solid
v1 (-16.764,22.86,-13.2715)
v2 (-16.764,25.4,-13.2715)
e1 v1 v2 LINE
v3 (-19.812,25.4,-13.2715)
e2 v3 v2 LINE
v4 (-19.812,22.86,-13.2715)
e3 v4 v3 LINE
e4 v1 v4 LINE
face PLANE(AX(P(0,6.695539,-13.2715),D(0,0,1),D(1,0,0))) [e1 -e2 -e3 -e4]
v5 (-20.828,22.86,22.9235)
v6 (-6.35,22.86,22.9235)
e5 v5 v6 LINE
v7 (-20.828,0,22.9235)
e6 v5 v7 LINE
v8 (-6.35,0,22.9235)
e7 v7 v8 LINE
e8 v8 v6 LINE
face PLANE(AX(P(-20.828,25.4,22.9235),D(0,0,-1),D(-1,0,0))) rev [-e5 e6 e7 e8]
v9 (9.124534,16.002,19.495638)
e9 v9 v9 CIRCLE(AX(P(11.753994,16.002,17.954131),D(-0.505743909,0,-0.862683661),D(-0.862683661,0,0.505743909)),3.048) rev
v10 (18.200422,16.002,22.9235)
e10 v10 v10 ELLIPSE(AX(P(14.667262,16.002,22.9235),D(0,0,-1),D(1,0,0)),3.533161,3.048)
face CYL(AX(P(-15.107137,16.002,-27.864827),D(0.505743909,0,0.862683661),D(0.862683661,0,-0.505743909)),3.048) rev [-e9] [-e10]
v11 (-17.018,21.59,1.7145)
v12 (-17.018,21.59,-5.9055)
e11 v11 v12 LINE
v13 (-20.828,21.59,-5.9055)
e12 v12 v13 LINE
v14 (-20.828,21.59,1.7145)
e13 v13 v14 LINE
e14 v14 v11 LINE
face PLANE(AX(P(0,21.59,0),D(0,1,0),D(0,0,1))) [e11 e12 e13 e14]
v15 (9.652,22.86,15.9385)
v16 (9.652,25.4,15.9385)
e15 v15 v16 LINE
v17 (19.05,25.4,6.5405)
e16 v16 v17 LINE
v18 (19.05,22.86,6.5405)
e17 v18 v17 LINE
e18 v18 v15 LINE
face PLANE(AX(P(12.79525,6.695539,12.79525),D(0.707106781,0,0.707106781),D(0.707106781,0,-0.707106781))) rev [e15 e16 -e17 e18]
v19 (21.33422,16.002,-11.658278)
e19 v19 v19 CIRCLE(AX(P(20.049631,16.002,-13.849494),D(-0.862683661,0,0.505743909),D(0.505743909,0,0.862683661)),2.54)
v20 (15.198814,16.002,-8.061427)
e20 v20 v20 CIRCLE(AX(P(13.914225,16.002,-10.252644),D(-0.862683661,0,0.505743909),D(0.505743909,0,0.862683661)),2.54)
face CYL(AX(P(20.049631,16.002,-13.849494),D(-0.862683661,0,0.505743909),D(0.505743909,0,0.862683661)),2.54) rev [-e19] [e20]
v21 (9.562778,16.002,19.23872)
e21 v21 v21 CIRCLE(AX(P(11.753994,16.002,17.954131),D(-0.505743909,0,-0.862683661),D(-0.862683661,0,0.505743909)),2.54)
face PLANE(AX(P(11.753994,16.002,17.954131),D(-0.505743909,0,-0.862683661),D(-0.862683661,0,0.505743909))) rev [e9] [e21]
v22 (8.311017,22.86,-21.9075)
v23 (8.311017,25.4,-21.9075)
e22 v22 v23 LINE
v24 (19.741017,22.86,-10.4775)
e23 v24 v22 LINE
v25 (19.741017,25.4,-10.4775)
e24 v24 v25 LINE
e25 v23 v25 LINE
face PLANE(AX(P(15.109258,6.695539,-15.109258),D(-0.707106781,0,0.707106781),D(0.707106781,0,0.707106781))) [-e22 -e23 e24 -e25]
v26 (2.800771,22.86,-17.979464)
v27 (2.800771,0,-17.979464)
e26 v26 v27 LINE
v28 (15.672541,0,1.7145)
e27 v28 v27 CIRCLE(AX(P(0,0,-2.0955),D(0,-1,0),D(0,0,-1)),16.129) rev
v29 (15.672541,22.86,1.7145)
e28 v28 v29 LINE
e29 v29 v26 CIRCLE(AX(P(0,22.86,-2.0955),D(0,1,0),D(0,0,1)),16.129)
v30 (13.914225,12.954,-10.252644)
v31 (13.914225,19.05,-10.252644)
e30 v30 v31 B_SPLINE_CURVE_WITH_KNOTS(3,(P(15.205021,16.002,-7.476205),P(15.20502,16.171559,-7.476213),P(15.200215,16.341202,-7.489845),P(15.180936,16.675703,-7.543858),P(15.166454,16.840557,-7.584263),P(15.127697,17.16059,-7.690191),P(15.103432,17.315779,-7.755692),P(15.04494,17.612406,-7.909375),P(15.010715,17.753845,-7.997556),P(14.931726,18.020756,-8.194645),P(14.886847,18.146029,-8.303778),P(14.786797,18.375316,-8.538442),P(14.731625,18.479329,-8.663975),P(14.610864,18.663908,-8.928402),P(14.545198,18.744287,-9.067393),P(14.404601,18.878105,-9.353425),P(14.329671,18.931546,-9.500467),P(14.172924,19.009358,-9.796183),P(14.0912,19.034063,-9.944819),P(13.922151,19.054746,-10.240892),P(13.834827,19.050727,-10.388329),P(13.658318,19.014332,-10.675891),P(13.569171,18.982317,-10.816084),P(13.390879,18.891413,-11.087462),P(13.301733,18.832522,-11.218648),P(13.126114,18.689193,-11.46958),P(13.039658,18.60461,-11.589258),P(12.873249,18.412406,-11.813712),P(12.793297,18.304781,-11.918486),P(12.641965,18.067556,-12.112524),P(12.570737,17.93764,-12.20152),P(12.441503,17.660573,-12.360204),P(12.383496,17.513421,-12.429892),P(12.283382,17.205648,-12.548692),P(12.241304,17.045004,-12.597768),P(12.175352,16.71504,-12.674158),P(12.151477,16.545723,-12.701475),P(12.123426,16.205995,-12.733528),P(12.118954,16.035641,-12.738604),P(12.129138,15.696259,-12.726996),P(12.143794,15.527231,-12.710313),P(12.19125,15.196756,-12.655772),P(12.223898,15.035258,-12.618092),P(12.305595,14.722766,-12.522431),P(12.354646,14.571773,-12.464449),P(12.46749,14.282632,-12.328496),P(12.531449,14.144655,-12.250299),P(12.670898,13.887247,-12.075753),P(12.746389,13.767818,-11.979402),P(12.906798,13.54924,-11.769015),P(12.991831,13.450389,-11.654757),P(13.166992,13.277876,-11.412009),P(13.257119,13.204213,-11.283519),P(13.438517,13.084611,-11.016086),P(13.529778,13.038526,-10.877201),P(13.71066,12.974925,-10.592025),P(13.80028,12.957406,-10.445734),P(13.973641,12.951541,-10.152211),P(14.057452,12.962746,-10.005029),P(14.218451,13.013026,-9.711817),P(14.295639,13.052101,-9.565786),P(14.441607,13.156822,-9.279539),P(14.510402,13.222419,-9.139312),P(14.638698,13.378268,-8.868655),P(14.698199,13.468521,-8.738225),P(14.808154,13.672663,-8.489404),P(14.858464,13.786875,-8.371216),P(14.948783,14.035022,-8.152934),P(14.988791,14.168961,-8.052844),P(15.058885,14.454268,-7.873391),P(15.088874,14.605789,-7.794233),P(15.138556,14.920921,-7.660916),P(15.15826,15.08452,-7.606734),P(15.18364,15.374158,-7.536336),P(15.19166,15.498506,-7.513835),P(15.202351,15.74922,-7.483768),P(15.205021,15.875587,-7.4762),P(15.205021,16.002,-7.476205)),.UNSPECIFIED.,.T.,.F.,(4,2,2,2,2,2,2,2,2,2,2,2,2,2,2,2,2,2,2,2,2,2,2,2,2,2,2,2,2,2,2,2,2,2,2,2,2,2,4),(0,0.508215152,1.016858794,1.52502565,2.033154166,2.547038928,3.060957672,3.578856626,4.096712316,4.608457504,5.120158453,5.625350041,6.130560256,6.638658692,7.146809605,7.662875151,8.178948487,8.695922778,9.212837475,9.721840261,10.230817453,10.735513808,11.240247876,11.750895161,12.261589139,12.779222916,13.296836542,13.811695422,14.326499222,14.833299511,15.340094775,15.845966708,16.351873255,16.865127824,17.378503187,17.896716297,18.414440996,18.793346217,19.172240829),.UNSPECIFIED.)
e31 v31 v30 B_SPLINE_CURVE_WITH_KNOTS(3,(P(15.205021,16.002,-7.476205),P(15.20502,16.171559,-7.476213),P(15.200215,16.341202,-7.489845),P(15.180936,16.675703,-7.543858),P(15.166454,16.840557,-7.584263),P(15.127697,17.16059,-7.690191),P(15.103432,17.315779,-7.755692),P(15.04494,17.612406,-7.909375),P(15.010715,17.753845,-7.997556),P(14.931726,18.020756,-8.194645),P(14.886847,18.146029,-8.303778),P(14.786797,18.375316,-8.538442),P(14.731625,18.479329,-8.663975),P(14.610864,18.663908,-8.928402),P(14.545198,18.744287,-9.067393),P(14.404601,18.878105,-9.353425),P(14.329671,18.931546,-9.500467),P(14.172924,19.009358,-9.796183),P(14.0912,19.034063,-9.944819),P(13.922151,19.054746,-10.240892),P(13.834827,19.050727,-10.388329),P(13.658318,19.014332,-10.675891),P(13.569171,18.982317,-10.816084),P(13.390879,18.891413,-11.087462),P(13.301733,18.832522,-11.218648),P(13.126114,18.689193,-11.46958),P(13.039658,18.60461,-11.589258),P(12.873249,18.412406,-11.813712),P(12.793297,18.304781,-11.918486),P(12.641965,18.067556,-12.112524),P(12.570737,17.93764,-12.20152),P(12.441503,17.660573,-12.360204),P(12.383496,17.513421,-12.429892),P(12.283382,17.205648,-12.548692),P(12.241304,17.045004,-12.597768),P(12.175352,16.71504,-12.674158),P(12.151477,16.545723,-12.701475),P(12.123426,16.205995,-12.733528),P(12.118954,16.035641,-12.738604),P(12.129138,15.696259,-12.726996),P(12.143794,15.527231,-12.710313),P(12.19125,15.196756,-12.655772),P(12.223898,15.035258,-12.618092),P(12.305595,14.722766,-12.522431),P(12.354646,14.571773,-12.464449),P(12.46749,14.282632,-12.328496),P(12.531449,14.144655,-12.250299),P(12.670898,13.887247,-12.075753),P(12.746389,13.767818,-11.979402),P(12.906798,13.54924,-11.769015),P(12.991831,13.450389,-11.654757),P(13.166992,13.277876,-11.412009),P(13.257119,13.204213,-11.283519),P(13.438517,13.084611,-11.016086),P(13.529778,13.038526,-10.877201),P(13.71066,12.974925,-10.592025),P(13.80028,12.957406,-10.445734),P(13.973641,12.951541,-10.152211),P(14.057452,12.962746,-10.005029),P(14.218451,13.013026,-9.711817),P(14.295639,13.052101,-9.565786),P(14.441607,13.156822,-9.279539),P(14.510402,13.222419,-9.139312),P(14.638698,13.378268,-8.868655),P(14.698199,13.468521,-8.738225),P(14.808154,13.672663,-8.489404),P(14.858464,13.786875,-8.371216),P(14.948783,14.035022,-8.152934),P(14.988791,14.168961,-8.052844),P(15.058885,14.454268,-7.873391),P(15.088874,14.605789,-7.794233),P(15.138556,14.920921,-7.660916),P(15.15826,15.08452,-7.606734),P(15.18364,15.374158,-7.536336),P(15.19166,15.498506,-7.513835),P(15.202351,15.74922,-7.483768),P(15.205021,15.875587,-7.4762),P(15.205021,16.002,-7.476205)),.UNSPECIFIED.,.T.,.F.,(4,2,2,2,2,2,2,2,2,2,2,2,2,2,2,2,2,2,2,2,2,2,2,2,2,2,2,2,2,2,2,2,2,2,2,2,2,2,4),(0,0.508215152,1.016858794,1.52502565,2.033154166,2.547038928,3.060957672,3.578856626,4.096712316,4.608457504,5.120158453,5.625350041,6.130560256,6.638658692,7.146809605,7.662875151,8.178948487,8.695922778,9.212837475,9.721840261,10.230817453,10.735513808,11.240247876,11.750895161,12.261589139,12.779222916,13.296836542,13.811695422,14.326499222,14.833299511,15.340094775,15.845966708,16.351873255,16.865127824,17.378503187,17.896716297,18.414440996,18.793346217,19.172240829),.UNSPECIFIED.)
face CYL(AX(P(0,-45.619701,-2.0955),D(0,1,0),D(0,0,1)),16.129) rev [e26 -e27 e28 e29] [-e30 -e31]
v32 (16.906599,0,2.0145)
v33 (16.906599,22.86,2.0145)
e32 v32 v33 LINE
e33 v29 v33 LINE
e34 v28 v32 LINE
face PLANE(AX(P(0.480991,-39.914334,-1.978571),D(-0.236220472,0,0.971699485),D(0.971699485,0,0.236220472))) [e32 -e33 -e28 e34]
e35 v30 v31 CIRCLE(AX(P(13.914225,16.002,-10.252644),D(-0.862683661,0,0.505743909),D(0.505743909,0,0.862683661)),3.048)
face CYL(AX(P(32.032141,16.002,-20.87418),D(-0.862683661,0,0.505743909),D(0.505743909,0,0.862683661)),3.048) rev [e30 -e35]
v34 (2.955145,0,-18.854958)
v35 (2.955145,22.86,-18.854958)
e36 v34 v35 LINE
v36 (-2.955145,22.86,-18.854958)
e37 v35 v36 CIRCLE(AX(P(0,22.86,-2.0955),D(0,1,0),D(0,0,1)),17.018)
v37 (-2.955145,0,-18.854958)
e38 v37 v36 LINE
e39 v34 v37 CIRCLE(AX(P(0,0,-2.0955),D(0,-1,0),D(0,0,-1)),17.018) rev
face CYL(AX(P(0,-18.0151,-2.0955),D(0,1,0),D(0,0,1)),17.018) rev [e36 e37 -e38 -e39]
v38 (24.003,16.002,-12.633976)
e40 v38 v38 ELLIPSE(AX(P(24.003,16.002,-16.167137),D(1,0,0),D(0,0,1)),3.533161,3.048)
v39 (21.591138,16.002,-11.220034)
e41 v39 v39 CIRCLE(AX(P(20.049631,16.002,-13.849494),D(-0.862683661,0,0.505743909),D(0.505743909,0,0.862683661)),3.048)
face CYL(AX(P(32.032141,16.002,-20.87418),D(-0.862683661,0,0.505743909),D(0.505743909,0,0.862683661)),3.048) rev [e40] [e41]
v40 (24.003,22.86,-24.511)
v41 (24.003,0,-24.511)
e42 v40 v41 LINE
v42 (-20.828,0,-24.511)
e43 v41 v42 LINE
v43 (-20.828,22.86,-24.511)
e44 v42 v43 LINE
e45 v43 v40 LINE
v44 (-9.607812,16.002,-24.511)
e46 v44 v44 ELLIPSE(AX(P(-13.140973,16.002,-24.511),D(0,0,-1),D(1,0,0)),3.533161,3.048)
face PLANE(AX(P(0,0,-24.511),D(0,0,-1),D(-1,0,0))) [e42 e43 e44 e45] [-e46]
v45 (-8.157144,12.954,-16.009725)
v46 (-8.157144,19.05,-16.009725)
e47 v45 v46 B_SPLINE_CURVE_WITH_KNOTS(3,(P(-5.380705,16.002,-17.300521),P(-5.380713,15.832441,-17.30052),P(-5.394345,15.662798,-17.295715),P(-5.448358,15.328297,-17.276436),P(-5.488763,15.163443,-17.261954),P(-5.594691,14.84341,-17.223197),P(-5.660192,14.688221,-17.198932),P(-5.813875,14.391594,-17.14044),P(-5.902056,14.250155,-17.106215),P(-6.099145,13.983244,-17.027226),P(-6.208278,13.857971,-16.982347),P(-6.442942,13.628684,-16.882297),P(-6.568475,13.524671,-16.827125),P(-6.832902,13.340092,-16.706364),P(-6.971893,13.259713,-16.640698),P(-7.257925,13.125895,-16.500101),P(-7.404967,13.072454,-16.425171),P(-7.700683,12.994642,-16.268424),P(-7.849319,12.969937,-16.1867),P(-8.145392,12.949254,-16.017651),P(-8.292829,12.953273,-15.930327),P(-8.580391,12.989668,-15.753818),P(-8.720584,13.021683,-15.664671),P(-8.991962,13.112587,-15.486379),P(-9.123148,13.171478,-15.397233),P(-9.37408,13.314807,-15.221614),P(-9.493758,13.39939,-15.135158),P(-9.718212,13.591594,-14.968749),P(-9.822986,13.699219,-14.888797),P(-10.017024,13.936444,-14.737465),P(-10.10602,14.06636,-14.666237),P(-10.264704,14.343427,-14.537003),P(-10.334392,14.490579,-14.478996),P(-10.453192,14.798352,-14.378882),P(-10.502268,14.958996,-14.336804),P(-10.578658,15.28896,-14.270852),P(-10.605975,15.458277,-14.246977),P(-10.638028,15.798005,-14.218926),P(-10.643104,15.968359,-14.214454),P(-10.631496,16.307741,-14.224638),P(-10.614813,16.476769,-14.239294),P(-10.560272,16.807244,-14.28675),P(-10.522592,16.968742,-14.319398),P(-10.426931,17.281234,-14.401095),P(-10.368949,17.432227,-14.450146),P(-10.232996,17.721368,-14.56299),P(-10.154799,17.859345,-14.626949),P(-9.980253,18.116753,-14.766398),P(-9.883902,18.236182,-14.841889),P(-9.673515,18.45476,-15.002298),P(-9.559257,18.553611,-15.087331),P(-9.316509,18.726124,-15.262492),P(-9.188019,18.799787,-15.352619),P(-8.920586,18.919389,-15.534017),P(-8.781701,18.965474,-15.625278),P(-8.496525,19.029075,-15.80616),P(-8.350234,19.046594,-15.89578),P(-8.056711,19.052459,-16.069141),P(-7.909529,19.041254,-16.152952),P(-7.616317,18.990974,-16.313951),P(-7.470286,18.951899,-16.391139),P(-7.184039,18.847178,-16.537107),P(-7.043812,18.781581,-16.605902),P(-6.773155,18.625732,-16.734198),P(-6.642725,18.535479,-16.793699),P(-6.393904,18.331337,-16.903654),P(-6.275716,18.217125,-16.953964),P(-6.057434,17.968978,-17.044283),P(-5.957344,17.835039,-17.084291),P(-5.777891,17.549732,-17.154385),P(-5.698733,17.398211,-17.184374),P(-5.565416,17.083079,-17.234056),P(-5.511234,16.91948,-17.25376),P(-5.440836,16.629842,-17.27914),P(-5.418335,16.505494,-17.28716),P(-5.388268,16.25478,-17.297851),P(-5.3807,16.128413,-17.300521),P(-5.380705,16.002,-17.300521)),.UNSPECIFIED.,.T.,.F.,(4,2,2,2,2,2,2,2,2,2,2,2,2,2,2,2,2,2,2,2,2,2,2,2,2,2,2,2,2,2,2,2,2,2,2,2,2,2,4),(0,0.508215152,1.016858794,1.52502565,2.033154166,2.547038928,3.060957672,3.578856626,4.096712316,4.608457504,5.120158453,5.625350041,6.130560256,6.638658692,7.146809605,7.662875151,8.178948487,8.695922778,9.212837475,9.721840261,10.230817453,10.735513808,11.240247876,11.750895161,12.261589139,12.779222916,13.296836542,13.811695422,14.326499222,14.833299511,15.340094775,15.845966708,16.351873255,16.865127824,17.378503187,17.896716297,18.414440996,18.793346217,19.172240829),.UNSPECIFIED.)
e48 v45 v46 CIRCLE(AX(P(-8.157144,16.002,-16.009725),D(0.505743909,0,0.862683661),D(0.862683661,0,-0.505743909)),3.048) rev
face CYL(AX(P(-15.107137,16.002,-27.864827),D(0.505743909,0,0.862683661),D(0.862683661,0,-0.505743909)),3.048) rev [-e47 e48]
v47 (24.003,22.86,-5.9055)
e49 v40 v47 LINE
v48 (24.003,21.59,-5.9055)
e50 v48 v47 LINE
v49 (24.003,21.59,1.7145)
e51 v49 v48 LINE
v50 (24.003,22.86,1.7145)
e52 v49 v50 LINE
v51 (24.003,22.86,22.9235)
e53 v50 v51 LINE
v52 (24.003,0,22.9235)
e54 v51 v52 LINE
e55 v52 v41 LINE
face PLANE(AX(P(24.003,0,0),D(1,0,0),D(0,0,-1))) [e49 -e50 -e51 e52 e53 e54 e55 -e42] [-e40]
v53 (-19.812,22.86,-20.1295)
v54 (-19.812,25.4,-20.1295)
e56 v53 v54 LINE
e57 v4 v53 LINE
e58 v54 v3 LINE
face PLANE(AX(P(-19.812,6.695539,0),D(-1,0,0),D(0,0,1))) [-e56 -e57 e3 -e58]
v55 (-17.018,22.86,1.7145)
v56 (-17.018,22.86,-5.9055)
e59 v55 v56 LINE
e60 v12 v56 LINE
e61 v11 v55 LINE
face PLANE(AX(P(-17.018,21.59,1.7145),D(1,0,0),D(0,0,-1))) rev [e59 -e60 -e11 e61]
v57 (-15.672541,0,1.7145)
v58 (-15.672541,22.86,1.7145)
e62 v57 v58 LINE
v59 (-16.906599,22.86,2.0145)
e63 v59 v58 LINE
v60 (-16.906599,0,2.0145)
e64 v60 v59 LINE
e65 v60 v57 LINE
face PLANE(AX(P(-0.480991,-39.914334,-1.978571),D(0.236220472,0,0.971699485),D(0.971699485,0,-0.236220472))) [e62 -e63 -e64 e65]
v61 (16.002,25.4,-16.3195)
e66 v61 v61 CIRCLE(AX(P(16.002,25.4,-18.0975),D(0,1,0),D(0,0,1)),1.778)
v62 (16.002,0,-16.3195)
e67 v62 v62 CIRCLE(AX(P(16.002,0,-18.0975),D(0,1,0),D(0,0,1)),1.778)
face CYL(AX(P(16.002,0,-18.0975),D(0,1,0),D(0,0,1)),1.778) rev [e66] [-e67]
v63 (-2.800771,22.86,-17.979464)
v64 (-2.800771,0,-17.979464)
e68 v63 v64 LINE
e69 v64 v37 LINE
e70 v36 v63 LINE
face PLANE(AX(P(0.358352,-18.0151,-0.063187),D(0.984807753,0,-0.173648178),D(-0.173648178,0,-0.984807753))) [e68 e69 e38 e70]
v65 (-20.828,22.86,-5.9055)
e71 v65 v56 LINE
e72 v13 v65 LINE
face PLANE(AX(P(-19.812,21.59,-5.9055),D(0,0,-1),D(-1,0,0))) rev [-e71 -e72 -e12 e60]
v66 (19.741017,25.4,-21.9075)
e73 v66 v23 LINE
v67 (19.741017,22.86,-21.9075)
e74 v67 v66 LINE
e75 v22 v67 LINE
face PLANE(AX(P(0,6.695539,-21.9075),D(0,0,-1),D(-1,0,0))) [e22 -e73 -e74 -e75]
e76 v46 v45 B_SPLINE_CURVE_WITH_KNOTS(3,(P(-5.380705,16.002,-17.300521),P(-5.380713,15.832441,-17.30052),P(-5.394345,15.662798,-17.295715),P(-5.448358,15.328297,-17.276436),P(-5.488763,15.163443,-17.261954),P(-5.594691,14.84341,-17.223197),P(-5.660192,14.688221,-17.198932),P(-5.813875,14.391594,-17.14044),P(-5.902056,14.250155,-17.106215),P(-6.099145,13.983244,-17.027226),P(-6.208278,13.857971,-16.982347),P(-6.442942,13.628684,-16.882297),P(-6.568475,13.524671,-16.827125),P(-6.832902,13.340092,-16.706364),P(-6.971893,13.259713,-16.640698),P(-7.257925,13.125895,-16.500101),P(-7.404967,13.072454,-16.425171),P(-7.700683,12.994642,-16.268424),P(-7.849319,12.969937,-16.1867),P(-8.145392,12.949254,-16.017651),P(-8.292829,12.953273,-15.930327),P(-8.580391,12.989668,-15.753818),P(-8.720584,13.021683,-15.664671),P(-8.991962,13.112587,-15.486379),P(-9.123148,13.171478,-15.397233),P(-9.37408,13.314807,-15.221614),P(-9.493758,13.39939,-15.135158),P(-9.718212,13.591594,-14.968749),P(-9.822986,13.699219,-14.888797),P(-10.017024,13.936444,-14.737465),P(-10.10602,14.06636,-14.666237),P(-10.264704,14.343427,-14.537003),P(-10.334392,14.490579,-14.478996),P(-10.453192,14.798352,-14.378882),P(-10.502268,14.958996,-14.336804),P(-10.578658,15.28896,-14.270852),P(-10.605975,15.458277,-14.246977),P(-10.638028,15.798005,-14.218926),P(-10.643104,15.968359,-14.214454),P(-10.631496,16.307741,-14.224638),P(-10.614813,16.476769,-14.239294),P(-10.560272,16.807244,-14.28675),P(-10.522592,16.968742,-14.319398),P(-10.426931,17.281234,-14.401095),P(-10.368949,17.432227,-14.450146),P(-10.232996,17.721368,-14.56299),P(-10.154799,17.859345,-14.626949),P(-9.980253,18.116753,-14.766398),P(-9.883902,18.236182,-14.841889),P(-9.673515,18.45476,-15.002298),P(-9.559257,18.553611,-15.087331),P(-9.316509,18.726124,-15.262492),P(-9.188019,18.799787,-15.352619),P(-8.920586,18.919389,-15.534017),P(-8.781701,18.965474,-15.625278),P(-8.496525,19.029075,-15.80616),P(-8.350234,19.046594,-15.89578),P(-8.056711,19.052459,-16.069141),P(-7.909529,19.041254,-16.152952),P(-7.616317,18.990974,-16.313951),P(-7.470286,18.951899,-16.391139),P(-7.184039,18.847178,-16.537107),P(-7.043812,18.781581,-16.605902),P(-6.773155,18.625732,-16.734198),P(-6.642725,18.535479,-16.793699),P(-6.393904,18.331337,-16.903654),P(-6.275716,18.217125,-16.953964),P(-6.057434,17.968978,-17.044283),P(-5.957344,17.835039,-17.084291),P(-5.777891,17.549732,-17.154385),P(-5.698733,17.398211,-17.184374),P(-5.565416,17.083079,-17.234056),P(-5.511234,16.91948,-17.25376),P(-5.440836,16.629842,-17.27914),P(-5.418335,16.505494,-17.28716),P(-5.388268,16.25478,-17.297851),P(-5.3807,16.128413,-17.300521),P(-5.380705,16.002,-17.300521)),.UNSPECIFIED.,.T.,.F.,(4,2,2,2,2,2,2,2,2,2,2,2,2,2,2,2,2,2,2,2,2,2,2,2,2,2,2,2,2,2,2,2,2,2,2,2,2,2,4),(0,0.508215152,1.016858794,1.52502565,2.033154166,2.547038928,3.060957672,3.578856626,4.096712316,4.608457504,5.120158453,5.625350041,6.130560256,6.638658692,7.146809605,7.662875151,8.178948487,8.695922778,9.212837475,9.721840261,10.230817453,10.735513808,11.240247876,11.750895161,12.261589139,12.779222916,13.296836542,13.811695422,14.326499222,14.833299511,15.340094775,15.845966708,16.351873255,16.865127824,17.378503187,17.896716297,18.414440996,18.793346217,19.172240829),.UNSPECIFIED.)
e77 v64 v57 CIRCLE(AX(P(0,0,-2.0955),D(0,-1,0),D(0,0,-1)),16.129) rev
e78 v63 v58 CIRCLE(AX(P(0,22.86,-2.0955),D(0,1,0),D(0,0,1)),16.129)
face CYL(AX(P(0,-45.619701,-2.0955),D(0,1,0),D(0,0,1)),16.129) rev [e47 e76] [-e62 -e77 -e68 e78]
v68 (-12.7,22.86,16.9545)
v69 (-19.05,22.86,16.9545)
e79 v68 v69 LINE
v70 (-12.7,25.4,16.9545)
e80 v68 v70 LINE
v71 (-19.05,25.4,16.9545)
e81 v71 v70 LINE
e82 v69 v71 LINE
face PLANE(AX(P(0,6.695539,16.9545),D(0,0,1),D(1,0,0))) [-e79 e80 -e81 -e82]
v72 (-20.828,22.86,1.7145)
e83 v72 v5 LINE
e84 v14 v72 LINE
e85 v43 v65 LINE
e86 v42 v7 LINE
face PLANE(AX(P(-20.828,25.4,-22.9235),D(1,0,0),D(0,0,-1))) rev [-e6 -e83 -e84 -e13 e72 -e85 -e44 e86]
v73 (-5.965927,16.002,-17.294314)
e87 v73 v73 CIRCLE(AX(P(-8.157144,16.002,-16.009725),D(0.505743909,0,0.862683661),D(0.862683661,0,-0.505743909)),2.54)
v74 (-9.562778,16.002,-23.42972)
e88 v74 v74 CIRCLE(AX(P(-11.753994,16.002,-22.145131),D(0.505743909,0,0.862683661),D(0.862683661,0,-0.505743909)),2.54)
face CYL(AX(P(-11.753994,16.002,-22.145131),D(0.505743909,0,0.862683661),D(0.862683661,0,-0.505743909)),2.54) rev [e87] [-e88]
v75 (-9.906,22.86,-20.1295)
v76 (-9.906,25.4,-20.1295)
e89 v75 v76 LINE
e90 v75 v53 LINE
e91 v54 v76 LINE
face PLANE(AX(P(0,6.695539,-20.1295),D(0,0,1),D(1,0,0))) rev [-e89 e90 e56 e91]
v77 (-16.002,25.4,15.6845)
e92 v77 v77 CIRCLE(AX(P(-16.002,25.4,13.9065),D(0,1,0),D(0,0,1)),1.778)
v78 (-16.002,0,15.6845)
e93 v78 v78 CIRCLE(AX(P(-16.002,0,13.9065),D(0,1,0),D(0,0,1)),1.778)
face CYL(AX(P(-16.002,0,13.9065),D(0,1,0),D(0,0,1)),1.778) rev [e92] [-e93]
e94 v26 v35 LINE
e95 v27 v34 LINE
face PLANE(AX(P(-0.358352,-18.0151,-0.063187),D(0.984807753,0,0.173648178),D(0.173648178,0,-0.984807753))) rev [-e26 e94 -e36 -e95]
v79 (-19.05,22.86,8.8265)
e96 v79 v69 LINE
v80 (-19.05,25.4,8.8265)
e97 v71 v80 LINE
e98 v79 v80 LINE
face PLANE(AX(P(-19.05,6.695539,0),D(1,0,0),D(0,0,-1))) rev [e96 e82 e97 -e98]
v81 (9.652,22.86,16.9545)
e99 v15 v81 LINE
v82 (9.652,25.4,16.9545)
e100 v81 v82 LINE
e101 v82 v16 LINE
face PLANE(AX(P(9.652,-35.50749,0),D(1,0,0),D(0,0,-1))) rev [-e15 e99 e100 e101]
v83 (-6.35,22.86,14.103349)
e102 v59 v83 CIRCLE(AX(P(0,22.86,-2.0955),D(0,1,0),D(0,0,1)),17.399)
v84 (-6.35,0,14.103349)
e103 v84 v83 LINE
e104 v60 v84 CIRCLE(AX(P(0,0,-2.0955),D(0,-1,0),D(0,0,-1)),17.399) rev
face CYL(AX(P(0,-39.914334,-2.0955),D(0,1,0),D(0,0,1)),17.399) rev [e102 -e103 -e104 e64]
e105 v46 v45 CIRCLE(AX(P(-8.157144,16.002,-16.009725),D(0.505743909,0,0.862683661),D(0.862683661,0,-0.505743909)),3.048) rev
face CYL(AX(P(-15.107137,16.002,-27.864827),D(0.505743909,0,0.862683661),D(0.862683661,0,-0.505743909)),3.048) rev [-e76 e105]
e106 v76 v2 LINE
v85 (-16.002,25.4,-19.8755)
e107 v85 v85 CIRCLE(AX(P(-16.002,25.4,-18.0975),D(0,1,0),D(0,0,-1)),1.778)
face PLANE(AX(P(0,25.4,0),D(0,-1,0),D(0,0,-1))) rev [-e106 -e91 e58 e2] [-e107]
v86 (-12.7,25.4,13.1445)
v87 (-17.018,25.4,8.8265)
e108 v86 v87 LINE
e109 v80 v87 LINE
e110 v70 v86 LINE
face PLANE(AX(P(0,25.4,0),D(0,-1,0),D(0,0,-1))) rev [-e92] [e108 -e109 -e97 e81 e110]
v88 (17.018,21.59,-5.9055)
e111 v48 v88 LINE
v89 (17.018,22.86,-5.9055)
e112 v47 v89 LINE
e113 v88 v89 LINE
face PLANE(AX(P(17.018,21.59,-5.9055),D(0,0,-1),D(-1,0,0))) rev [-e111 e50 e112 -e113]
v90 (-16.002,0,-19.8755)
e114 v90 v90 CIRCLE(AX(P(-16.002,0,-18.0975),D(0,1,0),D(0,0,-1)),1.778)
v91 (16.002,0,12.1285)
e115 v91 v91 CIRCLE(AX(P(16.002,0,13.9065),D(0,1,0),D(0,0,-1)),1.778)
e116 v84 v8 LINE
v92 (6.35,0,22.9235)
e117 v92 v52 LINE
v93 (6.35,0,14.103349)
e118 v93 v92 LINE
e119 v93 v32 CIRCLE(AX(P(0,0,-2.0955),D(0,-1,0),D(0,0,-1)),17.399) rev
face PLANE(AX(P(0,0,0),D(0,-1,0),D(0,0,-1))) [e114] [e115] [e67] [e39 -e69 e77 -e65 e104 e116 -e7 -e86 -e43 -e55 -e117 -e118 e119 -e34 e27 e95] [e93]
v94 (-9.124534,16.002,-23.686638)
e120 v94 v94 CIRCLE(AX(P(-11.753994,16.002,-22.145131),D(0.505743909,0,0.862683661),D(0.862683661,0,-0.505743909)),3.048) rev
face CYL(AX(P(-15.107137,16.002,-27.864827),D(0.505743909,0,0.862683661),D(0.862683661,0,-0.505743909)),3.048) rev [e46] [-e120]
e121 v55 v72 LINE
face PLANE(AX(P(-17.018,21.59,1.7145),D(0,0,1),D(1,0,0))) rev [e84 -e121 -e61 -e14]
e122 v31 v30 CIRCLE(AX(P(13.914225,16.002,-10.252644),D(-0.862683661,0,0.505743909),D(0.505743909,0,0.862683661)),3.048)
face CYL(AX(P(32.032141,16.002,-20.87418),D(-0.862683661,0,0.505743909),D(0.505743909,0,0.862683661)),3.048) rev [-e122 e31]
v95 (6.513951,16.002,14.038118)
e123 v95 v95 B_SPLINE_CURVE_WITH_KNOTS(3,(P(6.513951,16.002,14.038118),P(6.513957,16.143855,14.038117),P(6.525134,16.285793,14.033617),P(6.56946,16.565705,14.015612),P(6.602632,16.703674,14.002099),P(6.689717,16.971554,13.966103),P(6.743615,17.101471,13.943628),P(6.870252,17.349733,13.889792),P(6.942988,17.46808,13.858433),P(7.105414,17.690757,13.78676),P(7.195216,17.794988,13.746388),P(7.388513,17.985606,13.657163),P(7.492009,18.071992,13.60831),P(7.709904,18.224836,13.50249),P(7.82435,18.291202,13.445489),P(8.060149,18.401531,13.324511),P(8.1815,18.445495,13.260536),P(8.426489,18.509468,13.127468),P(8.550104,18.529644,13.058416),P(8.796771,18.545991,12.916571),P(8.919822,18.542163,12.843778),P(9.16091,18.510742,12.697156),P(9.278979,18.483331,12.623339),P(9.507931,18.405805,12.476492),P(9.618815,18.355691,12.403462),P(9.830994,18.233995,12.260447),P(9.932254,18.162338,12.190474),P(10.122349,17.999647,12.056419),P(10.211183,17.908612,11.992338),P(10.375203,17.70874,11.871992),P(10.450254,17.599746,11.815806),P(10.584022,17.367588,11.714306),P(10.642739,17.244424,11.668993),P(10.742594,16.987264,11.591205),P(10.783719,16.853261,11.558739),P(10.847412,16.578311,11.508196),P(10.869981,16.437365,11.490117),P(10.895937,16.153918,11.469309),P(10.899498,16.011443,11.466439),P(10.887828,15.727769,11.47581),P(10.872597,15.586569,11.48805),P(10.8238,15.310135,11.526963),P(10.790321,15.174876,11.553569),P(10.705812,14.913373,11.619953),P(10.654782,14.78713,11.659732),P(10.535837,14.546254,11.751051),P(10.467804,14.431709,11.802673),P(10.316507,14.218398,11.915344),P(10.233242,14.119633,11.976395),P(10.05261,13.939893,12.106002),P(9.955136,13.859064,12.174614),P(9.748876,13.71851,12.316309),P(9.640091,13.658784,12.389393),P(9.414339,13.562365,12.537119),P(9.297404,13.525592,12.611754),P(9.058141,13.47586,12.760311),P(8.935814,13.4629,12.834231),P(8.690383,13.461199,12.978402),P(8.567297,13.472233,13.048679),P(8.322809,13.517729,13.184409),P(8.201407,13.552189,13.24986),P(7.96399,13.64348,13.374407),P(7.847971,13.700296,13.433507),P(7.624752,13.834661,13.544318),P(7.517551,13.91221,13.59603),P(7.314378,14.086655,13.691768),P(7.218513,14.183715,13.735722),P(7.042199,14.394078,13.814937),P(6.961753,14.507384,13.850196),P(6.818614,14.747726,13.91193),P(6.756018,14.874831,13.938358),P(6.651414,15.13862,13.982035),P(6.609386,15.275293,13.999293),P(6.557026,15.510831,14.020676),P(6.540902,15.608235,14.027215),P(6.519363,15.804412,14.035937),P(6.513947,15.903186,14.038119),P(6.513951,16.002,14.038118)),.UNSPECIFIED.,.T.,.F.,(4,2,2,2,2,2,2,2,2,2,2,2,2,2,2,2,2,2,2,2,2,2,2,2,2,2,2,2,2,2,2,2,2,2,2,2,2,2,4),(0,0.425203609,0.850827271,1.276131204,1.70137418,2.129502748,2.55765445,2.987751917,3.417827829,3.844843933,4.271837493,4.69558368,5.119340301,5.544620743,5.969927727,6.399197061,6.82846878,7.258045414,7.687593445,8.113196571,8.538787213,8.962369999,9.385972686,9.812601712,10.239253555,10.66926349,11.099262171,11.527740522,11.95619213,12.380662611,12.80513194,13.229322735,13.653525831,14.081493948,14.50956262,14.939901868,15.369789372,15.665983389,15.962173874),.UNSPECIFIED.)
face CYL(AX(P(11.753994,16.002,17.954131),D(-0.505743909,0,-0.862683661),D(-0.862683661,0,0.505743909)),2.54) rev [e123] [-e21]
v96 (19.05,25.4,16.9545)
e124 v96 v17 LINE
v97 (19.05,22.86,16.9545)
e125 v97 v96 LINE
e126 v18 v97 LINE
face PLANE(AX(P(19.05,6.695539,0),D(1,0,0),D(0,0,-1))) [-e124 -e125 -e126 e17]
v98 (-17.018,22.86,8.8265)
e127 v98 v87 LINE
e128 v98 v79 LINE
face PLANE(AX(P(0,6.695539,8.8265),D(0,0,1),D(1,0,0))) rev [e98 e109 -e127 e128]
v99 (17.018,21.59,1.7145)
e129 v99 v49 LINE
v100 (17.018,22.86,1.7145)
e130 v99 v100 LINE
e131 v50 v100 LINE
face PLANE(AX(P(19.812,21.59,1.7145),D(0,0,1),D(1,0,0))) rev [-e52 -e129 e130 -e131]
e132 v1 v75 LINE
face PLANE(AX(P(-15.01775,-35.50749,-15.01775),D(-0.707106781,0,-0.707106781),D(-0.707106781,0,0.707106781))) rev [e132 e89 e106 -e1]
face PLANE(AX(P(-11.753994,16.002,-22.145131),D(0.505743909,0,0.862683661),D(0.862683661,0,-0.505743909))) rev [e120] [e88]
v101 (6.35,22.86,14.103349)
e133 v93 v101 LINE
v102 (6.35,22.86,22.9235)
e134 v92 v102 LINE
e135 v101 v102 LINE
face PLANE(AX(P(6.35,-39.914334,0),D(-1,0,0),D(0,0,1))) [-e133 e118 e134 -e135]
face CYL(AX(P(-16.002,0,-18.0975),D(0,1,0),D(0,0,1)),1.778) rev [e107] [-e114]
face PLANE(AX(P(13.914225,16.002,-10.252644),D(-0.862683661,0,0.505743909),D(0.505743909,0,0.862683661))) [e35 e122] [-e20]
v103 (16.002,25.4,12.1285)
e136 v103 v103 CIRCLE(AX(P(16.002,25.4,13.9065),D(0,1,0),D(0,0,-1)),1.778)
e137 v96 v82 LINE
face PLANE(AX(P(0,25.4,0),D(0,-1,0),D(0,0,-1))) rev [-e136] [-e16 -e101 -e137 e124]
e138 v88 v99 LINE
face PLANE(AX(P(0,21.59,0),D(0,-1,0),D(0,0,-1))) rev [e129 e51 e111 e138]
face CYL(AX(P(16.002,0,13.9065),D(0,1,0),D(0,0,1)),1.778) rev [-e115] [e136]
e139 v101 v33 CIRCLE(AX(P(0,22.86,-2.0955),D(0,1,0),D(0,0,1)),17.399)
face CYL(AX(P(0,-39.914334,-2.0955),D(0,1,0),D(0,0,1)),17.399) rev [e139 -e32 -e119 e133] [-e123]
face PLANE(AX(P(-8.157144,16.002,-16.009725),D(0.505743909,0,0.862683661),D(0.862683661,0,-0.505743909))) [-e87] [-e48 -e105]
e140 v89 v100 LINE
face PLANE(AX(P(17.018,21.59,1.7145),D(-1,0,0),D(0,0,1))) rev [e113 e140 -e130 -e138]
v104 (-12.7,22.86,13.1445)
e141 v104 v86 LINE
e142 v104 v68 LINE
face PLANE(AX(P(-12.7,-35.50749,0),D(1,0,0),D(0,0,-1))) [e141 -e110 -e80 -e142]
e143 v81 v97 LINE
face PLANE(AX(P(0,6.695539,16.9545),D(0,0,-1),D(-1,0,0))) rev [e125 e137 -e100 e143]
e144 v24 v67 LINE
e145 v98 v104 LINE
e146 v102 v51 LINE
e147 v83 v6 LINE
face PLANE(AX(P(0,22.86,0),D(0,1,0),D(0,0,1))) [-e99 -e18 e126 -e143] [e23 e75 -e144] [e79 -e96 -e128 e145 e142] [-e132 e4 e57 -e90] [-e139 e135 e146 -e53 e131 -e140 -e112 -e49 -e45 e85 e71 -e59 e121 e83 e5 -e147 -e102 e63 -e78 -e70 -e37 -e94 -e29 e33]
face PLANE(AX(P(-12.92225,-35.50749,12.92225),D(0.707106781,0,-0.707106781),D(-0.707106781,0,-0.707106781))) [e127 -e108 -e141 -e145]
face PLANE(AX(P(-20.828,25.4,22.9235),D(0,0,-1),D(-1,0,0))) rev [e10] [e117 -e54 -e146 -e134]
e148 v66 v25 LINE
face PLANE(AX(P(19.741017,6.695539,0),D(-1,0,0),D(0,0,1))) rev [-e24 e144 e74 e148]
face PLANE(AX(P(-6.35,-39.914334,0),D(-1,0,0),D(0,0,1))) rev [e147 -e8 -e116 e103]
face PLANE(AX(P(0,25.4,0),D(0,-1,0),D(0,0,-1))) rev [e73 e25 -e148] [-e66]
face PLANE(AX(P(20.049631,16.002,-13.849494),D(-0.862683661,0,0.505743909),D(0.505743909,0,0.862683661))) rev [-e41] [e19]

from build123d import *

# Parameters (mm, degrees)
SKETCH1_W                 = 41.656
SKETCH1_H                 = 45.847
BOSS_EXTRUDE1_DEPTH       = 25.4
SKETCH2_R                 = 16.129
CUT_EXTRUDE1_DEPTH        = 25.4
CUT_EXTRUDE2_DEPTH        = 3.81
CUT_EXTRUDE6_START        = -25.4
CUT_EXTRUDE6_DEPTH        = 25.4
CUT_EXTRUDE7_REACH        = 58.4
CUT_EXTRUDE7_END_RADIUS   = 16.129
SKETCH7_R                 = 3.048
SKETCH14_W                = 2.524584731
SKETCH14_H                = 21.209
SKETCH14_W_2              = 2.54
SKETCH14_W_3              = 7.43654476
SKETCH14_H_2              = 2.672753785
CUT_EXTRUDE10_DEPTH       = 2.54
SKETCH17_W                = 45.847
SKETCH17_H                = 22.86
BOSS_EXTRUDE3_DEPTH       = 3.175
CUT_EXTRUDE12_REACH       = 43.576
SKETCH12_R                = 3.048
SKETCH18_W                = 44.831
SKETCH18_H                = 22.86
BOSS_EXTRUDE4_DEPTH       = 1.5875
CUT_EXTRUDE13_DEPTH       = 44.190833792
CUT_EXTRUDE13_DEPTH_BACK  = 44.190833792
SKETCH11_R                = 3.048
SKETCH4_R                 = 1.778
CUT_EXTRUDE14_DEPTH       = 43.685983001
SKETCH19_R                = 3.175
SKETCH19_R_2              = 2.54
BOSS_EXTRUDE5_DEPTH       = 7.112
CIRPATTERN3_START         = 14.321246389
CIRPATTERN3_OUTLINE_R     = 3.048
CIRPATTERN3_OUTLINE_R_2   = 2.54
CIRPATTERN3_DEPTH         = 7.112
CIRPATTERN3_START_2       = 17.188786362
CIRPATTERN3_2_OUTLINE_R   = 3.048
CIRPATTERN3_2_OUTLINE_R_2 = 2.54
CIRPATTERN3_2_DEPTH       = 7.112
CIRPATTERN3_START_3       = 14.033500302
CIRPATTERN3_3_OUTLINE_W   = 10
CIRPATTERN3_3_OUTLINE_H   = 10
CIRPATTERN3_3_OUTLINE_R   = 2.54
CIRPATTERN3_3_DEPTH       = 7.112
SKETCH20_W                = 1.508584731
SKETCH20_H                = 6.858
SKETCH20_W_2              = 0.746584731
SKETCH20_H_2              = 8.128
BOSS_EXTRUDE6_DEPTH       = 2.54
SKETCH20_5_W              = 7.43654476
SKETCH20_5_H              = 2.672753785
CUT_EXTRUDE17_DEPTH       = 2.54
SKETCH21_W                = 3.175
SKETCH21_H                = 7.62
CUT_EXTRUDE18_DEPTH       = 1.27
CUT_EXTRUDE19_DEPTH       = 22.86


# Read off the part's stored shape, not the designer's step: CirPattern3
with BuildPart() as part:
    # Sketch1 → Boss-Extrude1 (new body)
    with BuildSketch(Plane(origin=(0, 0, 0), x_dir=(1, 0, 0), z_dir=(0, 1, 0))):
        Rectangle(SKETCH1_W, SKETCH1_H)
    extrude(amount=BOSS_EXTRUDE1_DEPTH)

    # Sketch2 → Cut-Extrude1 (cut)
    with BuildSketch(Plane(origin=(0, 25.4, 0), x_dir=(1, 0, 0), z_dir=(0, 1, 0))):
        with Locations(Location((0, 2.0955, 0), (0, 0, 270))):
            Circle(SKETCH2_R)
    extrude(amount=-CUT_EXTRUDE1_DEPTH, mode=Mode.SUBTRACT)

    # Sketch3 → Cut-Extrude2 (cut)
    with BuildSketch(Plane(origin=(0, 25.4, 0), x_dir=(1, 0, 0), z_dir=(0, 1, 0))):
        Polygon((17.018, -1.7145), (19.812, -1.7145), (20.828, -1.7145), (20.828, 5.9055), (17.018, 5.9055), align=None)
        Polygon((-17.018, 5.9055), (-19.812, 5.9055), (-20.828, 5.9055), (-20.828, -1.7145), (-19.812, -1.7145), (-17.018, -1.7145), align=None)
    extrude(amount=-CUT_EXTRUDE2_DEPTH, mode=Mode.SUBTRACT)

    # Sketch6 → Cut-Extrude6 (cut)
    with BuildSketch(Plane(origin=(0, 25.4, 0), x_dir=(1, 0, 0), z_dir=(0, 1, 0)).offset(CUT_EXTRUDE6_START)):
        with BuildLine():
            ThreePointArc((-2.800771458, 17.979464248), (-1.405734975, 18.163124286), (0, 18.2245))
            ThreePointArc((0, 18.2245), (1.405734975, 18.163124286), (2.800771458, 17.979464248))
            Line((2.800771458, 17.979464248), (2.955144688, 18.854958341))
            ThreePointArc((2.955144688, 18.854958341), (0, 19.1135), (-2.955144688, 18.854958341))
            Line((-2.955144688, 18.854958341), (-2.800771458, 17.979464248))
        make_face()
        with BuildLine():
            Line((0, 18.2245), (0, 2.0955))
            Line((0, 2.0955), (2.800771458, 17.979464248))
            ThreePointArc((2.800771458, 17.979464248), (1.405734975, 18.163124286), (0, 18.2245))
        make_face()
        with BuildLine():
            Line((-2.800771458, 17.979464248), (0, 2.0955))
            Line((0, 2.0955), (0, 18.2245))
            ThreePointArc((0, 18.2245), (-1.405734975, 18.163124286), (-2.800771458, 17.979464248))
        make_face()
    extrude(amount=CUT_EXTRUDE6_DEPTH, mode=Mode.SUBTRACT)

    # Cut-Extrude7: up to this cylinder (the profile starts outside it)
    cut_extrude7_end = Plane(origin=(0, 16.002, -2.0955), z_dir=(0, 1, 0)) * Cylinder(CUT_EXTRUDE7_END_RADIUS, 150.058, mode=Mode.PRIVATE)
    # Sketch7 → Cut-Extrude7 (cut, up to the surface)
    with BuildSketch(Plane.XY.offset(22.9235), mode=Mode.PRIVATE) as cut_extrude7_sk1:
        with Locations((0, 16.002)):
            Circle(SKETCH7_R)
    cut_extrude7_tool1 = extrude(cut_extrude7_sk1.sketch, amount=-CUT_EXTRUDE7_REACH, mode=Mode.PRIVATE) - cut_extrude7_end
    add(cut_extrude7_tool1.solids().sort_by_distance((0, 16.002, 22.9235))[0], mode=Mode.SUBTRACT)

    # Sketch14 → Cut-Extrude10 (cut)
    with BuildSketch(Plane(origin=(0, 25.4, 0), x_dir=(1, 0, 0), z_dir=(0, 1, 0))):
        Polygon((20.828, 22.9235), (-20.828, 22.9235), (-20.828, 5.9055), (-18.303415269, 5.9055), (-18.303415269, 20.3835), (20.828, 20.3835), align=None)
        with Locations((-19.565707635, -12.319)):
            Rectangle(SKETCH14_W, SKETCH14_H)
        with Locations((19.558, -12.319)):
            Rectangle(SKETCH14_W_2, SKETCH14_H)
        with Locations((0, -20.25731759)):
            Rectangle(SKETCH14_W_3, SKETCH14_H_2)
    extrude(amount=-CUT_EXTRUDE10_DEPTH, mode=Mode.SUBTRACT)

    # Sketch17 → Boss-Extrude3 (add)
    with BuildSketch(Plane(origin=(20.828, 0, 0), x_dir=(0, 0, -1), z_dir=(1, 0, 0))):
        with Locations((0, 11.43)):
            Rectangle(SKETCH17_W, SKETCH17_H)
    extrude(amount=BOSS_EXTRUDE3_DEPTH)

    # Cut-Extrude12: up to this plane
    cut_extrude12_end = Plane(origin=(24.003, 0, 0), z_dir=(1, 0, 0))
    # Sketch12 → Cut-Extrude12 (cut, up to the surface)
    with BuildSketch(Plane(origin=(0.914260378, 0, -0.535980498), x_dir=(-0.50574390925612, 0, -0.862683660590797), z_dir=(0.862683660590797, 0, -0.50574390925612)), mode=Mode.PRIVATE) as cut_extrude12_sk1:
        with Locations(Location((1.807753611, 16.002, 0), (0, 0, 180))):
            Circle(SKETCH12_R)
    cut_extrude12_tool1 = split(extrude(cut_extrude12_sk1.sketch, amount=CUT_EXTRUDE12_REACH, mode=Mode.PRIVATE), bisect_by=cut_extrude12_end, keep=Keep.BOTH, mode=Mode.PRIVATE)
    add(cut_extrude12_tool1.solids().sort_by_distance((0, 16.002, -2.0955))[0], mode=Mode.SUBTRACT)

    # Sketch18 → Boss-Extrude4 (add)
    with BuildSketch(Plane(origin=(0, 0, -22.9235), x_dir=(-1, 0, 0), z_dir=(0, 0, -1))):
        with Locations((-1.5875, 11.43)):
            Rectangle(SKETCH18_W, SKETCH18_H)
    extrude(amount=BOSS_EXTRUDE4_DEPTH)

    # Sketch11 → Cut-Extrude13 (cut, two sides: drawn at the far end of the back side and taken through both)
    with BuildSketch(Plane(origin=(-0.914260378, 0, -1.559519502), x_dir=(0.862683660590797, 0, -0.50574390925612), z_dir=(0.50574390925612, 0, 0.862683660590797)).offset(-CUT_EXTRUDE13_DEPTH_BACK)):
        with Locations((1.059786362, 16.002)):
            Circle(SKETCH11_R)
    extrude(amount=CUT_EXTRUDE13_DEPTH + CUT_EXTRUDE13_DEPTH_BACK, mode=Mode.SUBTRACT)

    # Sketch4 → Cut-Extrude14 (cut, through all)
    with BuildSketch(Plane(origin=(0, 25.4, 0), x_dir=(1, 0, 0), z_dir=(0, 1, 0))):
        with Locations(Location((-16.002, -13.9065, 0), (0, 0, 270))):
            Circle(SKETCH4_R)
        with Locations(Location((-16.002, 18.0975, 0), (0, 0, 90))):
            Circle(SKETCH4_R)
        with Locations(Location((16.002, 18.0975, 0), (0, 0, 270))):
            Circle(SKETCH4_R)
        with Locations(Location((16.002, -13.9065, 0), (0, 0, 90))):
            Circle(SKETCH4_R)
    extrude(amount=-CUT_EXTRUDE14_DEPTH, mode=Mode.SUBTRACT)

    # Sketch19 → Boss-Extrude5 (add)
    with BuildSketch(Plane(origin=(-9.07140389, 0, -15.473744264), x_dir=(0.8626836605907969, 0, -0.5057439092561202), z_dir=(0.5057439092561202, 0, 0.8626836605907969))):
        with Locations((1.059786362, 16.002)):
            Circle(SKETCH19_R)
        with Locations((1.059786362, 16.002)):
            Circle(SKETCH19_R_2, mode=Mode.SUBTRACT)
    extrude(amount=-BOSS_EXTRUDE5_DEPTH)

    # CirPattern3 outline → CirPattern3 (add)
    with BuildSketch(Plane(origin=(0, 0, 0), x_dir=(0.8626836605907969, 0, -0.5057439092561199), z_dir=(0.50574390925612, 0, 0.862683660590797)).offset(CIRPATTERN3_START)):
        with Locations((1.059786362, 16.002)):
            Circle(CIRPATTERN3_OUTLINE_R)
        with Locations((1.059786362, 16.002)):
            Circle(CIRPATTERN3_OUTLINE_R_2, mode=Mode.SUBTRACT)
    extrude(amount=CIRPATTERN3_DEPTH)

    # CirPattern3 2 outline → CirPattern3 2 (add)
    with BuildSketch(Plane(origin=(0, 0, 0), x_dir=(0.5057439092561169, 0, 0.8626836605907988), z_dir=(0.8626836605907988, 0, -0.5057439092561169)).offset(CIRPATTERN3_START_2)):
        with Locations((-1.807753611, -16.002)):
            Circle(CIRPATTERN3_2_OUTLINE_R)
        with Locations((-1.807753611, -16.002)):
            Circle(CIRPATTERN3_2_OUTLINE_R_2, mode=Mode.SUBTRACT)
    extrude(amount=CIRPATTERN3_2_DEPTH)

    # CirPattern3 3 outline → CirPattern3 3 (add)
    with BuildSketch(Plane(origin=(0, 0, 0), x_dir=(0.9999998560090501, 0, -0.0005366394310553081), z_dir=(0.0005366394310553081, 0, 0.9999998560090502)).offset(CIRPATTERN3_START_3)):
        with Locations((0, 16)):
            Rectangle(CIRPATTERN3_3_OUTLINE_W, CIRPATTERN3_3_OUTLINE_H)
        with Locations((0.001124528, 16.002)):
            Circle(CIRPATTERN3_3_OUTLINE_R, mode=Mode.SUBTRACT)
    extrude(amount=CIRPATTERN3_3_DEPTH)

    # Sketch20 → Boss-Extrude6 (add)
    with BuildSketch(Plane(origin=(0, 25.4, 0), x_dir=(1, 0, 0), z_dir=(0, 1, 0))):
        Polygon((9.835016705, 20.3835), (19.741016705, 20.3835), (19.741016705, 21.9075), (8.311016705, 21.9075), align=None)
        with Locations((-19.057707635, 16.7005)):
            Rectangle(SKETCH20_W, SKETCH20_H)
        Polygon((19.05, -6.5405), (18.288, -7.3025), (18.288, -16.9545), (19.05, -16.9545), align=None)
        with Locations((-18.676707635, -12.8905)):
            Rectangle(SKETCH20_W_2, SKETCH20_H_2)
    extrude(amount=-BOSS_EXTRUDE6_DEPTH)

    # Sketch20<5> → Cut-Extrude17 (cut)
    with BuildSketch(Plane(origin=(0, 25.4, 0), x_dir=(1, 0, 0), z_dir=(0, 1, 0))):
        Polygon((19.741016705, 20.3835), (19.741016705, 18.0975), (19.741016705, 10.4775), (9.835016705, 20.3835), (-18.303415269, 20.3835), (-18.303415269, 20.1295), (-16.002, 20.1295), (-9.906, 20.1295), (-16.764, 13.2715), (-18.303415269, 13.2715), (-18.303415269, 5.9055), (-17.018, 5.9055), (-17.018, -1.7145), (-18.303415269, -1.7145), (-18.303415269, -8.8265), (-17.018, -8.8265), (-12.7, -13.1445), (-12.7, -16.9545), (-16.002, -16.9545), (-18.303415269, -16.9545), (-18.303415269, -22.9235), (18.288, -22.9235), (18.288, -16.9545), (16.002, -16.9545), (9.652, -16.9545), (9.652, -15.9385), (18.288, -7.3025), (18.288, -1.7145), (17.018, -1.7145), (17.018, 5.9055), (20.828, 5.9055), (20.828, 20.3835), align=None)
        with Locations((0, -20.25731759)):
            Rectangle(SKETCH20_5_W, SKETCH20_5_H, mode=Mode.SUBTRACT)
        with BuildLine():
            ThreePointArc((2.800771458, 17.979464248), (0, -14.0335), (-2.800771458, 17.979464248))
            Line((-2.800771458, 17.979464248), (-2.955144688, 18.854958341))
            ThreePointArc((-2.955144688, 18.854958341), (0, 19.1135), (2.955144688, 18.854958341))
            Line((2.955144688, 18.854958341), (2.800771458, 17.979464248))
        make_face(mode=Mode.SUBTRACT)
    extrude(amount=-CUT_EXTRUDE17_DEPTH, mode=Mode.SUBTRACT)

    # Sketch21 → Cut-Extrude18 (cut)
    with BuildSketch(Plane(origin=(0, 22.86, 0), x_dir=(1, 0, 0), z_dir=(0, 1, 0))):
        with Locations((22.4155, 2.0955)):
            Rectangle(SKETCH21_W, SKETCH21_H)
    extrude(amount=-CUT_EXTRUDE18_DEPTH, mode=Mode.SUBTRACT)

    # Sketch22 → Cut-Extrude19 (cut)
    with BuildSketch(Plane(origin=(0, 22.86, 0), x_dir=(1, 0, 0), z_dir=(0, 1, 0))):
        with BuildLine():
            ThreePointArc((15.672540987, -1.7145), (0, -14.0335), (-15.672540987, -1.7145))
            Line((-15.672540987, -1.7145), (-16.906599333, -2.0145))
            ThreePointArc((-16.906599333, -2.0145), (-13.10543472, -9.348834048), (-6.35, -14.103348755))
            Line((-6.35, -14.103348755), (-6.35, -22.9235))
            Line((-6.35, -22.9235), (6.35, -22.9235))
            Line((6.35, -22.9235), (6.35, -14.103348755))
            ThreePointArc((6.35, -14.103348755), (13.10543472, -9.348834048), (16.906599333, -2.0145))
            Line((16.906599333, -2.0145), (15.672540987, -1.7145))
        make_face()
    extrude(amount=-CUT_EXTRUDE19_DEPTH, mode=Mode.SUBTRACT)


solid = part.part
